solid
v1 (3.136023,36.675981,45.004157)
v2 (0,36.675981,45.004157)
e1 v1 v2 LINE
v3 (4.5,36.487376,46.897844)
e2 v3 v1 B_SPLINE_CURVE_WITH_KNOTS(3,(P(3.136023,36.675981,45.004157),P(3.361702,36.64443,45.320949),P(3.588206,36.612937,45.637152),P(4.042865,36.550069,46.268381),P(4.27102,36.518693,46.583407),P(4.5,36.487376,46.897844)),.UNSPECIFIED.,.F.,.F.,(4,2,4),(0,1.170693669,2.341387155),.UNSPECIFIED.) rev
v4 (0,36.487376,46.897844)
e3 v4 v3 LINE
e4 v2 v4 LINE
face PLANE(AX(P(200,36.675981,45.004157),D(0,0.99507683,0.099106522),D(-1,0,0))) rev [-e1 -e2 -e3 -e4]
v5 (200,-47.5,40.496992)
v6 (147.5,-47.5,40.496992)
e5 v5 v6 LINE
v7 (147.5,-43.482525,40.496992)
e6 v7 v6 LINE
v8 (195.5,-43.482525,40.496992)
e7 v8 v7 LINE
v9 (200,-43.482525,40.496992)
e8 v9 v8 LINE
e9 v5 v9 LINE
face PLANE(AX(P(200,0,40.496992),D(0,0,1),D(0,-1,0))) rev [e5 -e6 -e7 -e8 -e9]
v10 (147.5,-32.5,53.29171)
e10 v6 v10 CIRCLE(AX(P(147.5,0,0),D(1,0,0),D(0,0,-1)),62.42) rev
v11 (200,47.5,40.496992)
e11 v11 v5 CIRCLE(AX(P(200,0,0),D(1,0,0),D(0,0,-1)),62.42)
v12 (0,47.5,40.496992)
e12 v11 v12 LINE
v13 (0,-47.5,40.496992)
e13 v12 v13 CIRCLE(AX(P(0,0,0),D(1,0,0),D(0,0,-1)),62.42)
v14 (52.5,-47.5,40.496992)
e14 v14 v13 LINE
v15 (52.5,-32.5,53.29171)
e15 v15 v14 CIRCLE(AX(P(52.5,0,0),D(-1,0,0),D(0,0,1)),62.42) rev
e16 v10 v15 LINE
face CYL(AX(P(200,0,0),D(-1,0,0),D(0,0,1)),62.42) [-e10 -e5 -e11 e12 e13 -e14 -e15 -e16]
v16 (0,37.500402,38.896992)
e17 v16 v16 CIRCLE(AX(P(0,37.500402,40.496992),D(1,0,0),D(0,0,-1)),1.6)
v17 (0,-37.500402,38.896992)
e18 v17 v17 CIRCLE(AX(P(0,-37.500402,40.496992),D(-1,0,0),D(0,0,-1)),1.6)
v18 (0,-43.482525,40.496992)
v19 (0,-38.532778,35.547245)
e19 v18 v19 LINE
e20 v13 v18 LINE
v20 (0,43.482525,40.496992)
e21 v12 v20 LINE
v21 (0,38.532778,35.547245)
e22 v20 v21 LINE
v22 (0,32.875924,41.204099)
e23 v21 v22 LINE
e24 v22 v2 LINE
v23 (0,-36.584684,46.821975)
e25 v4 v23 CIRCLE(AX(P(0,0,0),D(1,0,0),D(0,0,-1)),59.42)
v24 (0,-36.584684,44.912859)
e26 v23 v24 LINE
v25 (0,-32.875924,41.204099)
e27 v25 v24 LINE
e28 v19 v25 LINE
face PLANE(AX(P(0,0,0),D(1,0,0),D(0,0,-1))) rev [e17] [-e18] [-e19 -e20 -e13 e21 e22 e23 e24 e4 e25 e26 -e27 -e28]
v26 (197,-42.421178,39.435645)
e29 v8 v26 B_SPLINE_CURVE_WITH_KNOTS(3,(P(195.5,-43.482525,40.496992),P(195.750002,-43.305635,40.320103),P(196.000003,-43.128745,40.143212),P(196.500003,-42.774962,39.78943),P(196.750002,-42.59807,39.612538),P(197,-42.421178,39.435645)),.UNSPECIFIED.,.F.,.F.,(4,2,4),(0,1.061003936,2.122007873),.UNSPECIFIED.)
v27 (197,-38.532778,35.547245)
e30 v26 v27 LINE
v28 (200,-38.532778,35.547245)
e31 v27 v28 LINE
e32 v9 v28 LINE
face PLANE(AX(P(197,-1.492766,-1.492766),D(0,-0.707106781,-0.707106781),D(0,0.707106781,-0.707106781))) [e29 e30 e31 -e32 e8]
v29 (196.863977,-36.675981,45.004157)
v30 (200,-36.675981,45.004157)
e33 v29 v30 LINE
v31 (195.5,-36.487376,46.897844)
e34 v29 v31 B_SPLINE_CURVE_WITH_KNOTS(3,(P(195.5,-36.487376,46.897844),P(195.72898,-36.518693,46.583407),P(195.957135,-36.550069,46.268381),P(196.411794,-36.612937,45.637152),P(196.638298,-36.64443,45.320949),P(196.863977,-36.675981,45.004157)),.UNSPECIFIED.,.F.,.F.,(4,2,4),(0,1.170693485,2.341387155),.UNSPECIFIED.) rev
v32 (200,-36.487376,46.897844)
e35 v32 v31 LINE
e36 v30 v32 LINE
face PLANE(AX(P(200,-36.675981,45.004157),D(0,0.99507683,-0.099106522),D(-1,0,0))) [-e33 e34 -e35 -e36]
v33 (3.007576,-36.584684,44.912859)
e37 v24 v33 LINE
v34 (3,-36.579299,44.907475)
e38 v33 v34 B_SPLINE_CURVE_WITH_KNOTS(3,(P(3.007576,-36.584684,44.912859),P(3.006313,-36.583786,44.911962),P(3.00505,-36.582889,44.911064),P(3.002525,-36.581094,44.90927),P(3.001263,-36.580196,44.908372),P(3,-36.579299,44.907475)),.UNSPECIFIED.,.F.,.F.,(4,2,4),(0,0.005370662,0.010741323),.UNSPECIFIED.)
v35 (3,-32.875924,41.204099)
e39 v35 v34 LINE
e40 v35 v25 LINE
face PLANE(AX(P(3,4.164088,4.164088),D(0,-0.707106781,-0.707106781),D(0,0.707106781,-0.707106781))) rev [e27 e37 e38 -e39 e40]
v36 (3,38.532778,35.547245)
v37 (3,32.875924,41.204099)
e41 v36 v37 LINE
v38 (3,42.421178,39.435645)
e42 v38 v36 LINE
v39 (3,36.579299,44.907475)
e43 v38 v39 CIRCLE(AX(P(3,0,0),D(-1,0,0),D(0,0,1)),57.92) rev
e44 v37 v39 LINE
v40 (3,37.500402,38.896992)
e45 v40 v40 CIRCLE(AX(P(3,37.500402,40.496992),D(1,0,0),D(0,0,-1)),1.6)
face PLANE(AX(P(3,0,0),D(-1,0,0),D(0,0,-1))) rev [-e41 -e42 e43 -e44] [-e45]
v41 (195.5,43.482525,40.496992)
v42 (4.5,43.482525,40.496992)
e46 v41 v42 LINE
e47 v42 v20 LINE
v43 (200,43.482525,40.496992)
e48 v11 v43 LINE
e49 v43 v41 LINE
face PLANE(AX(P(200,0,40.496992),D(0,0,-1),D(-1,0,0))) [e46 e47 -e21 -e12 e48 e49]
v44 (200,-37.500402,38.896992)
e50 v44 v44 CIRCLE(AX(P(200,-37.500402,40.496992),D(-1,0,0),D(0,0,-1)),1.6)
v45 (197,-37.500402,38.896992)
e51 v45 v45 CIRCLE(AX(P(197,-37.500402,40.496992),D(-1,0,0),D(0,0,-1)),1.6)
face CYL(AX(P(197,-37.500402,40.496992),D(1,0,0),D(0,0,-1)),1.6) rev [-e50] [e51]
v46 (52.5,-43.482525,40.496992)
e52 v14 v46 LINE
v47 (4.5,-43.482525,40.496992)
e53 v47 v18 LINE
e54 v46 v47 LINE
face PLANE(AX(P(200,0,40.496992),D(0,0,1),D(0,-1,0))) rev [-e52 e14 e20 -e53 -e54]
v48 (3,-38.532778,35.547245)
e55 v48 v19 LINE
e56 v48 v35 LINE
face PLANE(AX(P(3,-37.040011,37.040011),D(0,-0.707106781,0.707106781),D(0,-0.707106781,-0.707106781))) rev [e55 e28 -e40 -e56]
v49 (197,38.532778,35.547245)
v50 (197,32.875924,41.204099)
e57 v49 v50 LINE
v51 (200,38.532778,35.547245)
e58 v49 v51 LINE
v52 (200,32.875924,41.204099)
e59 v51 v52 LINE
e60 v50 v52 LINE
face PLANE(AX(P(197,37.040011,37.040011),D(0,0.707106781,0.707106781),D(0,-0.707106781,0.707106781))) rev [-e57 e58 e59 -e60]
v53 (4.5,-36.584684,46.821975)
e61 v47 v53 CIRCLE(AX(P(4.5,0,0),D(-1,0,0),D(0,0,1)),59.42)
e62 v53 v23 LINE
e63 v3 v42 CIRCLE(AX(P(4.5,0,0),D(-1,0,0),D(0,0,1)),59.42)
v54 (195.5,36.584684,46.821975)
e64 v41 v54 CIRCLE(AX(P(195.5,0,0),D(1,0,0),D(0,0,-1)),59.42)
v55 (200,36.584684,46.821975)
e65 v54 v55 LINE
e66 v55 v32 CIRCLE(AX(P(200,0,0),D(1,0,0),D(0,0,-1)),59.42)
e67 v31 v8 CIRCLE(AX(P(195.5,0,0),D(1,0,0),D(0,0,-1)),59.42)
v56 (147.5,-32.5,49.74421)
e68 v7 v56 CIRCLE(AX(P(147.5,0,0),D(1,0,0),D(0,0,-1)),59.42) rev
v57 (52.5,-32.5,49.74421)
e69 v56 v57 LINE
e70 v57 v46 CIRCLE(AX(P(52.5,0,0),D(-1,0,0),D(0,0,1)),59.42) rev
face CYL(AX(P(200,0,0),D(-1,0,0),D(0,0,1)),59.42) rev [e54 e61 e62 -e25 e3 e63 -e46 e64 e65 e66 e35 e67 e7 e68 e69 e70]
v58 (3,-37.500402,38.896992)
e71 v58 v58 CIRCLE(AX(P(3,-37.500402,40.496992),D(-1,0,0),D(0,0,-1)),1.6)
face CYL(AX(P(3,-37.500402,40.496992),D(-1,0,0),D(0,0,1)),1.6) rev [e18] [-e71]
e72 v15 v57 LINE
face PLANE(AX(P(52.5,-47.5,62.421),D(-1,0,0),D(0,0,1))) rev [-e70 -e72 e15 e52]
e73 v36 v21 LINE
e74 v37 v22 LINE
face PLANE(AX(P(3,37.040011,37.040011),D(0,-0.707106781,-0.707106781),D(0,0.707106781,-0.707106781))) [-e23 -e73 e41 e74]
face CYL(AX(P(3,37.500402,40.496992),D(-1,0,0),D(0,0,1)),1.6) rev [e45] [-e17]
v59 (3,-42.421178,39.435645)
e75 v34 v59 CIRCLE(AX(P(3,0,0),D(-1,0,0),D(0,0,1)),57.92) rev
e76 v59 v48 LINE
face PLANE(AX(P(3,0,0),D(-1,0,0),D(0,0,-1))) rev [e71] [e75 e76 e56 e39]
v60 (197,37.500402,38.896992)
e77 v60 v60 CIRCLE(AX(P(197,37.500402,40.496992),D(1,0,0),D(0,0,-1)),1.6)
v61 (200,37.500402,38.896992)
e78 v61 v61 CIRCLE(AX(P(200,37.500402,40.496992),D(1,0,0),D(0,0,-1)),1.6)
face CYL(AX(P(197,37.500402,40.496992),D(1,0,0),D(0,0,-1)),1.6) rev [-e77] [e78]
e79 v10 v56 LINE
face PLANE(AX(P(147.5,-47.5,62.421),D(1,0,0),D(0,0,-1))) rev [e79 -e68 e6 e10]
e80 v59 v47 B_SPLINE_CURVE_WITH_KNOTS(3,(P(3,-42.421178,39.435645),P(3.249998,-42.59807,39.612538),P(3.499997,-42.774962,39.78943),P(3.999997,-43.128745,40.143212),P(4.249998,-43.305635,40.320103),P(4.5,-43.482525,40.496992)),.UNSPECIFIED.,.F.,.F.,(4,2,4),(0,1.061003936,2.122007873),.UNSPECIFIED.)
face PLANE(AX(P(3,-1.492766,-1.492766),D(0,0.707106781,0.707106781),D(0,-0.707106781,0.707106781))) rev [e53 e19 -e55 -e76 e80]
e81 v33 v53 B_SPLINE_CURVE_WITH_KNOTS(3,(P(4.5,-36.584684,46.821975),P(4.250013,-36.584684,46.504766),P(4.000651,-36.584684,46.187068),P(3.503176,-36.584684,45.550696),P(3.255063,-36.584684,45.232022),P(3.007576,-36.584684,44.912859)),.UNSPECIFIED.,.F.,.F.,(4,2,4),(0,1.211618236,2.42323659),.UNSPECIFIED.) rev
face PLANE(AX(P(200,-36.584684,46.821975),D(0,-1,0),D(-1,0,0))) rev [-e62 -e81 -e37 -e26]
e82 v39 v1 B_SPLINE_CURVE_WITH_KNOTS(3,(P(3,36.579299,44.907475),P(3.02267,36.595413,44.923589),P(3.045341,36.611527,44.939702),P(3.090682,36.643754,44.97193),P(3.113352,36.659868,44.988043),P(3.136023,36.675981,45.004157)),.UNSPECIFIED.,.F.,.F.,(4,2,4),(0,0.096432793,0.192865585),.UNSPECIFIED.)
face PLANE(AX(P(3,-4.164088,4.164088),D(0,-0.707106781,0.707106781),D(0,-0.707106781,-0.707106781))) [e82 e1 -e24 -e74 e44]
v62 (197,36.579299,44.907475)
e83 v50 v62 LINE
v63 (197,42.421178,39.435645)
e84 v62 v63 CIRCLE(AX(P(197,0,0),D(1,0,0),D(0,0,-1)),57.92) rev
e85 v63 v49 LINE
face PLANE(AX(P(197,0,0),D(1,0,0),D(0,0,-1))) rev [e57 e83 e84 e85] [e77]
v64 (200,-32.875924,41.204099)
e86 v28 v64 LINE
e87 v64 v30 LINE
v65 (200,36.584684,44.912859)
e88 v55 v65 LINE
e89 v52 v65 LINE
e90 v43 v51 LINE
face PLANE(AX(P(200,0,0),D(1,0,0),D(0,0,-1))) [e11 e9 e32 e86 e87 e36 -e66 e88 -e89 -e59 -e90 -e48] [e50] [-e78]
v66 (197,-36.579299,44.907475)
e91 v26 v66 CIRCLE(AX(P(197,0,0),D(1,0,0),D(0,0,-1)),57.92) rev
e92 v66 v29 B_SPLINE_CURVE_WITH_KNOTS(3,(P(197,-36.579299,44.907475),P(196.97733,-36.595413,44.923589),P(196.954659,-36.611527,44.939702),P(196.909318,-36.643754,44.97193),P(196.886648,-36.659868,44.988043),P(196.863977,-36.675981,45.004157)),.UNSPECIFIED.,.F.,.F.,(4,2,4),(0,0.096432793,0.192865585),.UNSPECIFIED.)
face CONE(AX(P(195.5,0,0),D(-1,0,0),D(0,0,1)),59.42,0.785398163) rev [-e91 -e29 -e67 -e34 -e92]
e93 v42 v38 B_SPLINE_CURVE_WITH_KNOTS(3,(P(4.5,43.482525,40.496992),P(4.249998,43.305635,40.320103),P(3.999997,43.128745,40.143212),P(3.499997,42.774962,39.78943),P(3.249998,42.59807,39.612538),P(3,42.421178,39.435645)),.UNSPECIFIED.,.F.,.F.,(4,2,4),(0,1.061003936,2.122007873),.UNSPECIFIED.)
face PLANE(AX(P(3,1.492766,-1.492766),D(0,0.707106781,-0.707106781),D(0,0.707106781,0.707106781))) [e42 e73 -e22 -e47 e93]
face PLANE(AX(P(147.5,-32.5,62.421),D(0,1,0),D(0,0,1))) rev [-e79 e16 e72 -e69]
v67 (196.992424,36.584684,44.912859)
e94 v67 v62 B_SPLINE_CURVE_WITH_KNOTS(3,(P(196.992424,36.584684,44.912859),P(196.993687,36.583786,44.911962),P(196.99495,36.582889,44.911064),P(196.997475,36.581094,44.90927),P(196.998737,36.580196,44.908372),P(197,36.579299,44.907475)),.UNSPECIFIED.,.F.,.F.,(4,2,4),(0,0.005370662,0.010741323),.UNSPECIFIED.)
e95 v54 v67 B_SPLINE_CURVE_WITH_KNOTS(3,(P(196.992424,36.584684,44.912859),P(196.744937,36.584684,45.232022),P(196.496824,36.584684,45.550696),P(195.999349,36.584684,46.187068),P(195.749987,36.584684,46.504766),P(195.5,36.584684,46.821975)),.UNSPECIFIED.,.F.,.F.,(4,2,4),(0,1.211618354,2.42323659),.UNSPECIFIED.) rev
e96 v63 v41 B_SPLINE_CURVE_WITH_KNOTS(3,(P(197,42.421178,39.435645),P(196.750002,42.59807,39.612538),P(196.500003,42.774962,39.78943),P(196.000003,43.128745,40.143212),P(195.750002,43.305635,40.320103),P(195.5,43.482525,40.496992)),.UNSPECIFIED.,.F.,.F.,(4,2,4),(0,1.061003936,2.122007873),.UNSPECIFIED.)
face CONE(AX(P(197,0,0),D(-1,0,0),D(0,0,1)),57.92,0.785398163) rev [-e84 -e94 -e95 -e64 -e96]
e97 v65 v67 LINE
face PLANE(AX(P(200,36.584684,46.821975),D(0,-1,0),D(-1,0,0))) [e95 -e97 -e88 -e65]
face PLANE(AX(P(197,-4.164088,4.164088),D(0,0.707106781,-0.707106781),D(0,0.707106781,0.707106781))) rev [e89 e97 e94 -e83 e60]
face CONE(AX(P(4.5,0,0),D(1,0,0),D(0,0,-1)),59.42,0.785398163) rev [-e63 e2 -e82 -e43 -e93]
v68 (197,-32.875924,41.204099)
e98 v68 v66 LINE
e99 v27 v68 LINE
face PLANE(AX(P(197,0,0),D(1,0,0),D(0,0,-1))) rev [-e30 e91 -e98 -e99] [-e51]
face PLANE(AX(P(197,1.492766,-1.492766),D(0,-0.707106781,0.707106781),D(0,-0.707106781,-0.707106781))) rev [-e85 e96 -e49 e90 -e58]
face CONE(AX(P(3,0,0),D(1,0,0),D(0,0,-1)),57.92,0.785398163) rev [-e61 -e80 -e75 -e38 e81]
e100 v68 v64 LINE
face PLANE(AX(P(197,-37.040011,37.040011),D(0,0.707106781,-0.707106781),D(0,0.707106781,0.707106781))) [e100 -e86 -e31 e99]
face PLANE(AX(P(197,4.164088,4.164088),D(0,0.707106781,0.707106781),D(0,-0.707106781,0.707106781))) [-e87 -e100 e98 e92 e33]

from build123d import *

# Parameters (mm, degrees)
EXTRUDE_2_DEPTH          = 200
EXTRUDE_START            = -3
SKETCH_3_R               = 1.6
EXTRUDE_3_DEPTH          = 3
MIRROR_START             = -3
MIRROR_3_COPY_1_SKETCH_R = 1.6
MIRROR_3_COPY_1_DEPTH    = 3
CHAMFER_2_SIZE           = 1.5
CHAMFER_2_SIZE_2         = 1.370885416
CUT_EXTRUDE_1_REACH      = 208.729
CUT_EXTRUDE_1_END_RADIUS = 62.42
SKETCH_4_W               = 95
SKETCH_4_H               = 15


with BuildPart() as part:
    # 草图2 → 凸台-拉伸2 (new body)
    with BuildSketch(Plane(origin=(0, 0, 0), x_dir=(0, 0, -1), z_dir=(1, 0, 0))):
        with BuildLine():
            Line((-40.496992481, 43.482525226), (-40.496992481, 47.5))
            ThreePointArc((-40.496992481, 47.5), (-62.42, 0), (-40.496992481, -47.5))
            Line((-40.496992481, -47.5), (-40.496992481, -43.482525226))
            ThreePointArc((-40.496992481, -43.482525226), (-59.42, 0), (-40.496992481, 43.482525226))
        make_face()
    extrude(amount=EXTRUDE_2_DEPTH)

    # 草图3 → 凸台-拉伸3 (add)
    with BuildSketch(Plane(origin=(200, 0, 0), x_dir=(0, 0, -1), z_dir=(1, 0, 0)).offset(EXTRUDE_START)):
        with BuildLine():
            Line((-35.547245013, 38.532777757), (-40.496992481, 43.482525226))
            ThreePointArc((-40.496992481, 43.482525226), (-43.333653576, 40.656252505), (-45.973519494, 37.64534374))
            Line((-45.973519494, 37.64534374), (-41.204099262, 32.875923508))
            Line((-41.204099262, 32.875923508), (-35.547245013, 38.532777757))
        make_face()
        with Locations((-40.496992481, 37.500401857)):
            Circle(SKETCH_3_R, mode=Mode.SUBTRACT)
    extrude_3 = extrude(amount=EXTRUDE_3_DEPTH)

    # 镜向2: 凸台-拉伸3 across plane
    add(extrude_3.mirror(Plane.ZX))

    # 镜向3: 凸台-拉伸3 across plane
    add(extrude_3.mirror(Plane(origin=(100, 0, 0), x_dir=(0, 0, 1), z_dir=(1, 0, 0))))

    # 镜向3 copy 1 sketch → 镜向3 copy 1 (add)
    with BuildSketch(Plane(origin=(0, 0, 0), x_dir=(0, 0, -1), z_dir=(-1, 0, 0)).offset(MIRROR_START)):
        with BuildLine():
            Line((-35.547245013, 38.532777757), (-40.496992481, 43.482525226))
            ThreePointArc((-40.496992481, 43.482525226), (-43.333653576, 40.656252505), (-45.973519494, 37.64534374))
            Line((-45.973519494, 37.64534374), (-41.204099262, 32.875923508))
            Line((-41.204099262, 32.875923508), (-35.547245013, 38.532777757))
        make_face()
        with Locations((-40.496992481, 37.500401857)):
            Circle(MIRROR_3_COPY_1_SKETCH_R, mode=Mode.SUBTRACT)
    extrude(amount=MIRROR_3_COPY_1_DEPTH)

    # 倒角2
    # the kernel refuses this chamfer: 1.5, 1.370885416 mm, written as the material it adds along each edge
    with BuildSketch(Plane(origin=(197, 37.64534374, 45.973519494), x_dir=(0, -0.7808949499846061, 0.6246623704758754), z_dir=(1, 0, 0)), Plane(origin=(3, -37.64534374, 45.973519494), x_dir=(0, 0.7808949499846081, 0.6246623704758728), z_dir=(-1, 0, 0))) as chamfer_2_piece_1:
        with BuildLine():
            Line((1.358262301, 0), (CHAMFER_2_SIZE * 0.110473116413, CHAMFER_2_SIZE * 0.993879112644))
            Line((CHAMFER_2_SIZE * 0.110473116413, CHAMFER_2_SIZE * 0.993879112644), (0, 0))
            ThreePointArc((0, 0), (0.697864858, -0.003878183), (1.358262301, 0))
        make_face()
    extrude(amount=3)
    with BuildSketch(Plane(origin=(197, 0, 0), x_dir=(0, 0.774455373383828, 0.6326285439631345), z_dir=(0, 0.6326285439631345, -0.774455373383828))) as chamfer_2_piece_2_section:
        Polygon((59.42, -CHAMFER_2_SIZE), (59.42 - CHAMFER_2_SIZE, 0), (59.42, 0), align=None)
    chamfer_2_piece_2 = revolve(axis=Axis((197, 0, 0), (1, 0, 0)), revolution_arc=15.163035172, mode=Mode.PRIVATE)
    chamfer_2_piece_2 = split(chamfer_2_piece_2, bisect_by=Plane(origin=(197, 0, 40.496992481), z_dir=(0, 0, -1)), keep=Keep.TOP, mode=Mode.PRIVATE)
    chamfer_2_piece_2 = split(chamfer_2_piece_2, bisect_by=Plane(origin=(197, 1.492766372, -1.492766372), z_dir=(0, -0.707106781186547, 0.707106781186548)), keep=Keep.TOP, mode=Mode.PRIVATE)
    add(chamfer_2_piece_2)
    with BuildSketch(Plane(origin=(197, 0, 0), x_dir=(0, 0.774455373383828, 0.6326285439631345), z_dir=(0, 0.6326285439631345, -0.774455373383828))) as chamfer_2_piece_3_section:
        Polygon((59.42, -CHAMFER_2_SIZE), (59.42 - CHAMFER_2_SIZE, 0), (59.42, 0), align=None)
    chamfer_2_piece_3 = revolve(axis=Axis((197, 0, 0), (1, 0, 0)), revolution_arc=15.163035172, mode=Mode.PRIVATE)
    chamfer_2_piece_3 = split(chamfer_2_piece_3, bisect_by=Plane(origin=(197, 0, 40.496992481), z_dir=(0, 0, 1)), keep=Keep.TOP, mode=Mode.PRIVATE)
    chamfer_2_piece_3 = split(chamfer_2_piece_3, bisect_by=Plane(origin=(197, -4.164087877, 4.164087877), z_dir=(0, 0.7071067811865476, -0.7071067811865476)), keep=Keep.TOP, mode=Mode.PRIVATE)
    chamfer_2_piece_3 = split(chamfer_2_piece_3, bisect_by=Plane(origin=(197, 1.492766372, -1.492766372), z_dir=(0, -0.707106781186547, 0.707106781186548)), keep=Keep.TOP, mode=Mode.PRIVATE)
    add(chamfer_2_piece_3)
    with BuildSketch(Plane(origin=(197, 0, 0), x_dir=(0, -0.774455373383828, 0.6326285439631345), z_dir=(0, -0.6326285439631345, -0.774455373383828))) as chamfer_2_piece_4_section:
        Polygon((59.42, CHAMFER_2_SIZE), (59.42 - CHAMFER_2_SIZE, 0), (59.42, 0), align=None)
    chamfer_2_piece_4 = revolve(axis=Axis((197, 0, 0), (-1, 0, 0)), revolution_arc=15.163035172, mode=Mode.PRIVATE)
    chamfer_2_piece_4 = split(chamfer_2_piece_4, bisect_by=Plane(origin=(197, 0, 40.496992481), z_dir=(0, 0, -1)), keep=Keep.TOP, mode=Mode.PRIVATE)
    chamfer_2_piece_4 = split(chamfer_2_piece_4, bisect_by=Plane(origin=(197, -1.492766372, -1.492766372), z_dir=(0, 0.707106781186547, 0.707106781186548)), keep=Keep.TOP, mode=Mode.PRIVATE)
    add(chamfer_2_piece_4)
    with BuildSketch(Plane(origin=(197, 0, 0), x_dir=(0, -0.774455373383828, 0.6326285439631345), z_dir=(0, -0.6326285439631345, -0.774455373383828))) as chamfer_2_piece_5_section:
        Polygon((59.42, CHAMFER_2_SIZE), (59.42 - CHAMFER_2_SIZE, 0), (59.42, 0), align=None)
    chamfer_2_piece_5 = revolve(axis=Axis((197, 0, 0), (-1, 0, 0)), revolution_arc=15.163035172, mode=Mode.PRIVATE)
    chamfer_2_piece_5 = split(chamfer_2_piece_5, bisect_by=Plane(origin=(197, 0, 40.496992481), z_dir=(0, 0, 1)), keep=Keep.TOP, mode=Mode.PRIVATE)
    chamfer_2_piece_5 = split(chamfer_2_piece_5, bisect_by=Plane(origin=(197, 4.164087877, 4.164087877), z_dir=(0, -0.7071067811865476, -0.7071067811865476)), keep=Keep.TOP, mode=Mode.PRIVATE)
    chamfer_2_piece_5 = split(chamfer_2_piece_5, bisect_by=Plane(origin=(197, -1.492766372, -1.492766372), z_dir=(0, 0.707106781186547, 0.707106781186548)), keep=Keep.TOP, mode=Mode.PRIVATE)
    add(chamfer_2_piece_5)
    with BuildSketch(Plane(origin=(3, 0, 0), x_dir=(0, 0.7744553733838281, 0.6326285439631345), z_dir=(0, 0.6326285439631345, -0.7744553733838281))) as chamfer_2_piece_6_section:
        Polygon((59.42, CHAMFER_2_SIZE), (59.42 - CHAMFER_2_SIZE, 0), (59.42, 0), align=None)
    chamfer_2_piece_6 = revolve(axis=Axis((3, 0, 0), (1, 0, 0)), revolution_arc=15.163035172, mode=Mode.PRIVATE)
    chamfer_2_piece_6 = split(chamfer_2_piece_6, bisect_by=Plane(origin=(3, 0, 40.496992481), z_dir=(0, 0, -1)), keep=Keep.TOP, mode=Mode.PRIVATE)
    chamfer_2_piece_6 = split(chamfer_2_piece_6, bisect_by=Plane(origin=(3, 1.492766372, -1.492766372), z_dir=(0, -0.707106781186547, 0.707106781186548)), keep=Keep.TOP, mode=Mode.PRIVATE)
    add(chamfer_2_piece_6)
    with BuildSketch(Plane(origin=(3, 0, 0), x_dir=(0, 0.7744553733838281, 0.6326285439631345), z_dir=(0, 0.6326285439631345, -0.7744553733838281))) as chamfer_2_piece_7_section:
        Polygon((59.42, CHAMFER_2_SIZE), (59.42 - CHAMFER_2_SIZE, 0), (59.42, 0), align=None)
    chamfer_2_piece_7 = revolve(axis=Axis((3, 0, 0), (1, 0, 0)), revolution_arc=15.163035172, mode=Mode.PRIVATE)
    chamfer_2_piece_7 = split(chamfer_2_piece_7, bisect_by=Plane(origin=(3, 0, 40.496992481), z_dir=(0, 0, 1)), keep=Keep.TOP, mode=Mode.PRIVATE)
    chamfer_2_piece_7 = split(chamfer_2_piece_7, bisect_by=Plane(origin=(3, -4.164087877, 4.164087877), z_dir=(0, 0.7071067811865476, -0.7071067811865476)), keep=Keep.TOP, mode=Mode.PRIVATE)
    chamfer_2_piece_7 = split(chamfer_2_piece_7, bisect_by=Plane(origin=(3, 1.492766372, -1.492766372), z_dir=(0, -0.707106781186547, 0.707106781186548)), keep=Keep.TOP, mode=Mode.PRIVATE)
    add(chamfer_2_piece_7)
    with BuildSketch(Plane(origin=(3, 0, 0), x_dir=(0, -0.7744553733838281, 0.6326285439631345), z_dir=(0, -0.6326285439631345, -0.7744553733838281))) as chamfer_2_piece_8_section:
        Polygon((59.42, -CHAMFER_2_SIZE), (59.42 - CHAMFER_2_SIZE, 0), (59.42, 0), align=None)
    chamfer_2_piece_8 = revolve(axis=Axis((3, 0, 0), (-1, 0, 0)), revolution_arc=15.163035172, mode=Mode.PRIVATE)
    chamfer_2_piece_8 = split(chamfer_2_piece_8, bisect_by=Plane(origin=(3, 0, 40.496992481), z_dir=(0, 0, -1)), keep=Keep.TOP, mode=Mode.PRIVATE)
    chamfer_2_piece_8 = split(chamfer_2_piece_8, bisect_by=Plane(origin=(3, -1.492766372, -1.492766372), z_dir=(0, 0.707106781186547, 0.707106781186548)), keep=Keep.TOP, mode=Mode.PRIVATE)
    add(chamfer_2_piece_8)
    with BuildSketch(Plane(origin=(3, 0, 0), x_dir=(0, -0.7744553733838281, 0.6326285439631345), z_dir=(0, -0.6326285439631345, -0.7744553733838281))) as chamfer_2_piece_9_section:
        Polygon((59.42, -CHAMFER_2_SIZE), (59.42 - CHAMFER_2_SIZE, 0), (59.42, 0), align=None)
    chamfer_2_piece_9 = revolve(axis=Axis((3, 0, 0), (-1, 0, 0)), revolution_arc=15.163035172, mode=Mode.PRIVATE)
    chamfer_2_piece_9 = split(chamfer_2_piece_9, bisect_by=Plane(origin=(3, 0, 40.496992481), z_dir=(0, 0, 1)), keep=Keep.TOP, mode=Mode.PRIVATE)
    chamfer_2_piece_9 = split(chamfer_2_piece_9, bisect_by=Plane(origin=(3, 4.164087877, 4.164087877), z_dir=(0, -0.7071067811865476, -0.7071067811865476)), keep=Keep.TOP, mode=Mode.PRIVATE)
    chamfer_2_piece_9 = split(chamfer_2_piece_9, bisect_by=Plane(origin=(3, -1.492766372, -1.492766372), z_dir=(0, 0.707106781186547, 0.707106781186548)), keep=Keep.TOP, mode=Mode.PRIVATE)
    add(chamfer_2_piece_9)
    with BuildSketch(Plane(origin=(197, -37.64534374, 45.973519494), x_dir=(0, 0.7815431035681409, 0.623851246103651), z_dir=(1, 0, 0)), Plane(origin=(3, 37.64534374, 45.973519494), x_dir=(0, -0.7815431035681428, 0.6238512461036486), z_dir=(-1, 0, 0))) as chamfer_2_piece_10:
        with BuildLine():
            Line((1.481642714, 0), (CHAMFER_2_SIZE_2 * 0.111504981769, -CHAMFER_2_SIZE_2 * 0.993763875055))
            Line((CHAMFER_2_SIZE_2 * 0.111504981769, -CHAMFER_2_SIZE_2 * 0.993763875055), (0, 0))
            ThreePointArc((0, 0), (0.761762493, 0.0046146), (1.481642714, 0))
        make_face()
    extrude(amount=3)
    with BuildSketch(Plane(origin=(197, 0, 0), x_dir=(0, 0.774455373383828, 0.6326285439631345), z_dir=(0, 0.6326285439631345, -0.774455373383828))) as chamfer_2_piece_11a_section:
        Polygon((59.42, -CHAMFER_2_SIZE), (59.42 - CHAMFER_2_SIZE, 0), (59.42, 0), align=None)
    chamfer_2_piece_11a = revolve(axis=Axis((197, 0, 0), (1, 0, 0)), revolution_arc=15.163035172, mode=Mode.PRIVATE)
    chamfer_2_piece_11a = split(chamfer_2_piece_11a, bisect_by=Plane(origin=(197, -4.164087877, 4.164087877), z_dir=(0, -0.7071067811865476, 0.7071067811865476)), keep=Keep.TOP, mode=Mode.PRIVATE)
    with BuildSketch(Plane(origin=(193.142475518, 37.64534374, 45.973519494), x_dir=(0, -0.7808949499846061, 0.6246623704758754), z_dir=(1, 0, 0))) as chamfer_2_piece_11b_section:
        with BuildLine():
            Line((1.358262301, 0), (CHAMFER_2_SIZE * 0.110473116413, CHAMFER_2_SIZE * 0.993879112644))
            Line((CHAMFER_2_SIZE * 0.110473116413, CHAMFER_2_SIZE * 0.993879112644), (0, 0))
            ThreePointArc((0, 0), (0.697864858, -0.003878183), (1.358262301, 0))
        make_face()
    chamfer_2_piece_11b = extrude(amount=6.857524482, mode=Mode.PRIVATE)
    chamfer_2_piece_11b = split(chamfer_2_piece_11b, bisect_by=Plane(origin=(197, 37.64534374, 45.973519494), z_dir=(-1, 0, 0)), keep=Keep.TOP, mode=Mode.PRIVATE)
    chamfer_2_piece_11 = chamfer_2_piece_11a & chamfer_2_piece_11b
    add(chamfer_2_piece_11)
    with BuildSketch(Plane(origin=(193.189644475, -37.64534374, 45.973519494), x_dir=(0, 0.7815431035681409, 0.623851246103651), z_dir=(1, 0, 0))) as chamfer_2_piece_12a_section:
        with BuildLine():
            Line((1.481642714, 0), (CHAMFER_2_SIZE_2 * 0.111504981769, -CHAMFER_2_SIZE_2 * 0.993763875055))
            Line((CHAMFER_2_SIZE_2 * 0.111504981769, -CHAMFER_2_SIZE_2 * 0.993763875055), (0, 0))
            ThreePointArc((0, 0), (0.761762493, 0.0046146), (1.481642714, 0))
        make_face()
    chamfer_2_piece_12a = extrude(amount=6.810355525, mode=Mode.PRIVATE)
    chamfer_2_piece_12a = split(chamfer_2_piece_12a, bisect_by=Plane(origin=(197, -37.64534374, 45.973519494), z_dir=(-1, 0, 0)), keep=Keep.TOP, mode=Mode.PRIVATE)
    with BuildSketch(Plane(origin=(197, 0, 0), x_dir=(0, -0.774455373383828, 0.6326285439631345), z_dir=(0, -0.6326285439631345, -0.774455373383828))) as chamfer_2_piece_12b_section:
        Polygon((59.42, CHAMFER_2_SIZE), (59.42 - CHAMFER_2_SIZE, 0), (59.42, 0), align=None)
    chamfer_2_piece_12b = revolve(axis=Axis((197, 0, 0), (-1, 0, 0)), revolution_arc=15.163035172, mode=Mode.PRIVATE)
    chamfer_2_piece_12b = split(chamfer_2_piece_12b, bisect_by=Plane(origin=(197, 4.164087877, 4.164087877), z_dir=(0, 0.7071067811865476, 0.7071067811865476)), keep=Keep.TOP, mode=Mode.PRIVATE)
    chamfer_2_piece_12 = chamfer_2_piece_12a & chamfer_2_piece_12b
    add(chamfer_2_piece_12)
    with BuildSketch(Plane(origin=(6.810355525, 37.64534374, 45.973519494), x_dir=(0, -0.7815431035681428, 0.6238512461036486), z_dir=(-1, 0, 0))) as chamfer_2_piece_13a_section:
        with BuildLine():
            Line((1.481642714, 0), (CHAMFER_2_SIZE_2 * 0.111504981769, -CHAMFER_2_SIZE_2 * 0.993763875055))
            Line((CHAMFER_2_SIZE_2 * 0.111504981769, -CHAMFER_2_SIZE_2 * 0.993763875055), (0, 0))
            ThreePointArc((0, 0), (0.761762493, 0.0046146), (1.481642714, 0))
        make_face()
    chamfer_2_piece_13a = extrude(amount=6.810355525, mode=Mode.PRIVATE)
    chamfer_2_piece_13a = split(chamfer_2_piece_13a, bisect_by=Plane(origin=(3, 37.64534374, 45.973519494), z_dir=(1, 0, 0)), keep=Keep.TOP, mode=Mode.PRIVATE)
    with BuildSketch(Plane(origin=(3, 0, 0), x_dir=(0, 0.7744553733838281, 0.6326285439631345), z_dir=(0, 0.6326285439631345, -0.7744553733838281))) as chamfer_2_piece_13b_section:
        Polygon((59.42, CHAMFER_2_SIZE), (59.42 - CHAMFER_2_SIZE, 0), (59.42, 0), align=None)
    chamfer_2_piece_13b = revolve(axis=Axis((3, 0, 0), (1, 0, 0)), revolution_arc=15.163035172, mode=Mode.PRIVATE)
    chamfer_2_piece_13b = split(chamfer_2_piece_13b, bisect_by=Plane(origin=(3, -4.164087877, 4.164087877), z_dir=(0, -0.7071067811865476, 0.7071067811865476)), keep=Keep.TOP, mode=Mode.PRIVATE)
    chamfer_2_piece_13 = chamfer_2_piece_13a & chamfer_2_piece_13b
    add(chamfer_2_piece_13)
    with BuildSketch(Plane(origin=(3, 0, 0), x_dir=(0, -0.7744553733838281, 0.6326285439631345), z_dir=(0, -0.6326285439631345, -0.7744553733838281))) as chamfer_2_piece_14a_section:
        Polygon((59.42, -CHAMFER_2_SIZE), (59.42 - CHAMFER_2_SIZE, 0), (59.42, 0), align=None)
    chamfer_2_piece_14a = revolve(axis=Axis((3, 0, 0), (-1, 0, 0)), revolution_arc=15.163035172, mode=Mode.PRIVATE)
    chamfer_2_piece_14a = split(chamfer_2_piece_14a, bisect_by=Plane(origin=(3, 4.164087877, 4.164087877), z_dir=(0, 0.7071067811865476, 0.7071067811865476)), keep=Keep.TOP, mode=Mode.PRIVATE)
    with BuildSketch(Plane(origin=(6.857524482, -37.64534374, 45.973519494), x_dir=(0, 0.7808949499846081, 0.6246623704758728), z_dir=(-1, 0, 0))) as chamfer_2_piece_14b_section:
        with BuildLine():
            Line((1.358262301, 0), (CHAMFER_2_SIZE * 0.110473116413, CHAMFER_2_SIZE * 0.993879112644))
            Line((CHAMFER_2_SIZE * 0.110473116413, CHAMFER_2_SIZE * 0.993879112644), (0, 0))
            ThreePointArc((0, 0), (0.697864858, -0.003878183), (1.358262301, 0))
        make_face()
    chamfer_2_piece_14b = extrude(amount=6.857524482, mode=Mode.PRIVATE)
    chamfer_2_piece_14b = split(chamfer_2_piece_14b, bisect_by=Plane(origin=(3, -37.64534374, 45.973519494), z_dir=(1, 0, 0)), keep=Keep.TOP, mode=Mode.PRIVATE)
    chamfer_2_piece_14 = chamfer_2_piece_14a & chamfer_2_piece_14b
    add(chamfer_2_piece_14)

    # 切除-拉伸1: up to this cylinder (the profile starts inside it)
    cut_extrude_1_end = Plane(origin=(100, 0, 0), z_dir=(-1, 0, 0)) * Cylinder(CUT_EXTRUDE_1_END_RADIUS, 543.298, mode=Mode.PRIVATE)
    # 草图4 → 切除-拉伸1 (cut, up to the surface)
    with BuildSketch(Plane(origin=(0, 0, 40.496992481), x_dir=(-1, 0, 0), z_dir=(0, 0, -1)), mode=Mode.PRIVATE) as cut_extrude_1_sk1:
        with Locations((-100, -40)):
            Rectangle(SKETCH_4_W, SKETCH_4_H)
    cut_extrude_1_tool1 = extrude(cut_extrude_1_sk1.sketch, amount=-CUT_EXTRUDE_1_REACH, mode=Mode.PRIVATE) & cut_extrude_1_end
    add(cut_extrude_1_tool1.solids().sort_by_distance((100, -40, 40.496992))[0], mode=Mode.SUBTRACT)


solid = part.part
